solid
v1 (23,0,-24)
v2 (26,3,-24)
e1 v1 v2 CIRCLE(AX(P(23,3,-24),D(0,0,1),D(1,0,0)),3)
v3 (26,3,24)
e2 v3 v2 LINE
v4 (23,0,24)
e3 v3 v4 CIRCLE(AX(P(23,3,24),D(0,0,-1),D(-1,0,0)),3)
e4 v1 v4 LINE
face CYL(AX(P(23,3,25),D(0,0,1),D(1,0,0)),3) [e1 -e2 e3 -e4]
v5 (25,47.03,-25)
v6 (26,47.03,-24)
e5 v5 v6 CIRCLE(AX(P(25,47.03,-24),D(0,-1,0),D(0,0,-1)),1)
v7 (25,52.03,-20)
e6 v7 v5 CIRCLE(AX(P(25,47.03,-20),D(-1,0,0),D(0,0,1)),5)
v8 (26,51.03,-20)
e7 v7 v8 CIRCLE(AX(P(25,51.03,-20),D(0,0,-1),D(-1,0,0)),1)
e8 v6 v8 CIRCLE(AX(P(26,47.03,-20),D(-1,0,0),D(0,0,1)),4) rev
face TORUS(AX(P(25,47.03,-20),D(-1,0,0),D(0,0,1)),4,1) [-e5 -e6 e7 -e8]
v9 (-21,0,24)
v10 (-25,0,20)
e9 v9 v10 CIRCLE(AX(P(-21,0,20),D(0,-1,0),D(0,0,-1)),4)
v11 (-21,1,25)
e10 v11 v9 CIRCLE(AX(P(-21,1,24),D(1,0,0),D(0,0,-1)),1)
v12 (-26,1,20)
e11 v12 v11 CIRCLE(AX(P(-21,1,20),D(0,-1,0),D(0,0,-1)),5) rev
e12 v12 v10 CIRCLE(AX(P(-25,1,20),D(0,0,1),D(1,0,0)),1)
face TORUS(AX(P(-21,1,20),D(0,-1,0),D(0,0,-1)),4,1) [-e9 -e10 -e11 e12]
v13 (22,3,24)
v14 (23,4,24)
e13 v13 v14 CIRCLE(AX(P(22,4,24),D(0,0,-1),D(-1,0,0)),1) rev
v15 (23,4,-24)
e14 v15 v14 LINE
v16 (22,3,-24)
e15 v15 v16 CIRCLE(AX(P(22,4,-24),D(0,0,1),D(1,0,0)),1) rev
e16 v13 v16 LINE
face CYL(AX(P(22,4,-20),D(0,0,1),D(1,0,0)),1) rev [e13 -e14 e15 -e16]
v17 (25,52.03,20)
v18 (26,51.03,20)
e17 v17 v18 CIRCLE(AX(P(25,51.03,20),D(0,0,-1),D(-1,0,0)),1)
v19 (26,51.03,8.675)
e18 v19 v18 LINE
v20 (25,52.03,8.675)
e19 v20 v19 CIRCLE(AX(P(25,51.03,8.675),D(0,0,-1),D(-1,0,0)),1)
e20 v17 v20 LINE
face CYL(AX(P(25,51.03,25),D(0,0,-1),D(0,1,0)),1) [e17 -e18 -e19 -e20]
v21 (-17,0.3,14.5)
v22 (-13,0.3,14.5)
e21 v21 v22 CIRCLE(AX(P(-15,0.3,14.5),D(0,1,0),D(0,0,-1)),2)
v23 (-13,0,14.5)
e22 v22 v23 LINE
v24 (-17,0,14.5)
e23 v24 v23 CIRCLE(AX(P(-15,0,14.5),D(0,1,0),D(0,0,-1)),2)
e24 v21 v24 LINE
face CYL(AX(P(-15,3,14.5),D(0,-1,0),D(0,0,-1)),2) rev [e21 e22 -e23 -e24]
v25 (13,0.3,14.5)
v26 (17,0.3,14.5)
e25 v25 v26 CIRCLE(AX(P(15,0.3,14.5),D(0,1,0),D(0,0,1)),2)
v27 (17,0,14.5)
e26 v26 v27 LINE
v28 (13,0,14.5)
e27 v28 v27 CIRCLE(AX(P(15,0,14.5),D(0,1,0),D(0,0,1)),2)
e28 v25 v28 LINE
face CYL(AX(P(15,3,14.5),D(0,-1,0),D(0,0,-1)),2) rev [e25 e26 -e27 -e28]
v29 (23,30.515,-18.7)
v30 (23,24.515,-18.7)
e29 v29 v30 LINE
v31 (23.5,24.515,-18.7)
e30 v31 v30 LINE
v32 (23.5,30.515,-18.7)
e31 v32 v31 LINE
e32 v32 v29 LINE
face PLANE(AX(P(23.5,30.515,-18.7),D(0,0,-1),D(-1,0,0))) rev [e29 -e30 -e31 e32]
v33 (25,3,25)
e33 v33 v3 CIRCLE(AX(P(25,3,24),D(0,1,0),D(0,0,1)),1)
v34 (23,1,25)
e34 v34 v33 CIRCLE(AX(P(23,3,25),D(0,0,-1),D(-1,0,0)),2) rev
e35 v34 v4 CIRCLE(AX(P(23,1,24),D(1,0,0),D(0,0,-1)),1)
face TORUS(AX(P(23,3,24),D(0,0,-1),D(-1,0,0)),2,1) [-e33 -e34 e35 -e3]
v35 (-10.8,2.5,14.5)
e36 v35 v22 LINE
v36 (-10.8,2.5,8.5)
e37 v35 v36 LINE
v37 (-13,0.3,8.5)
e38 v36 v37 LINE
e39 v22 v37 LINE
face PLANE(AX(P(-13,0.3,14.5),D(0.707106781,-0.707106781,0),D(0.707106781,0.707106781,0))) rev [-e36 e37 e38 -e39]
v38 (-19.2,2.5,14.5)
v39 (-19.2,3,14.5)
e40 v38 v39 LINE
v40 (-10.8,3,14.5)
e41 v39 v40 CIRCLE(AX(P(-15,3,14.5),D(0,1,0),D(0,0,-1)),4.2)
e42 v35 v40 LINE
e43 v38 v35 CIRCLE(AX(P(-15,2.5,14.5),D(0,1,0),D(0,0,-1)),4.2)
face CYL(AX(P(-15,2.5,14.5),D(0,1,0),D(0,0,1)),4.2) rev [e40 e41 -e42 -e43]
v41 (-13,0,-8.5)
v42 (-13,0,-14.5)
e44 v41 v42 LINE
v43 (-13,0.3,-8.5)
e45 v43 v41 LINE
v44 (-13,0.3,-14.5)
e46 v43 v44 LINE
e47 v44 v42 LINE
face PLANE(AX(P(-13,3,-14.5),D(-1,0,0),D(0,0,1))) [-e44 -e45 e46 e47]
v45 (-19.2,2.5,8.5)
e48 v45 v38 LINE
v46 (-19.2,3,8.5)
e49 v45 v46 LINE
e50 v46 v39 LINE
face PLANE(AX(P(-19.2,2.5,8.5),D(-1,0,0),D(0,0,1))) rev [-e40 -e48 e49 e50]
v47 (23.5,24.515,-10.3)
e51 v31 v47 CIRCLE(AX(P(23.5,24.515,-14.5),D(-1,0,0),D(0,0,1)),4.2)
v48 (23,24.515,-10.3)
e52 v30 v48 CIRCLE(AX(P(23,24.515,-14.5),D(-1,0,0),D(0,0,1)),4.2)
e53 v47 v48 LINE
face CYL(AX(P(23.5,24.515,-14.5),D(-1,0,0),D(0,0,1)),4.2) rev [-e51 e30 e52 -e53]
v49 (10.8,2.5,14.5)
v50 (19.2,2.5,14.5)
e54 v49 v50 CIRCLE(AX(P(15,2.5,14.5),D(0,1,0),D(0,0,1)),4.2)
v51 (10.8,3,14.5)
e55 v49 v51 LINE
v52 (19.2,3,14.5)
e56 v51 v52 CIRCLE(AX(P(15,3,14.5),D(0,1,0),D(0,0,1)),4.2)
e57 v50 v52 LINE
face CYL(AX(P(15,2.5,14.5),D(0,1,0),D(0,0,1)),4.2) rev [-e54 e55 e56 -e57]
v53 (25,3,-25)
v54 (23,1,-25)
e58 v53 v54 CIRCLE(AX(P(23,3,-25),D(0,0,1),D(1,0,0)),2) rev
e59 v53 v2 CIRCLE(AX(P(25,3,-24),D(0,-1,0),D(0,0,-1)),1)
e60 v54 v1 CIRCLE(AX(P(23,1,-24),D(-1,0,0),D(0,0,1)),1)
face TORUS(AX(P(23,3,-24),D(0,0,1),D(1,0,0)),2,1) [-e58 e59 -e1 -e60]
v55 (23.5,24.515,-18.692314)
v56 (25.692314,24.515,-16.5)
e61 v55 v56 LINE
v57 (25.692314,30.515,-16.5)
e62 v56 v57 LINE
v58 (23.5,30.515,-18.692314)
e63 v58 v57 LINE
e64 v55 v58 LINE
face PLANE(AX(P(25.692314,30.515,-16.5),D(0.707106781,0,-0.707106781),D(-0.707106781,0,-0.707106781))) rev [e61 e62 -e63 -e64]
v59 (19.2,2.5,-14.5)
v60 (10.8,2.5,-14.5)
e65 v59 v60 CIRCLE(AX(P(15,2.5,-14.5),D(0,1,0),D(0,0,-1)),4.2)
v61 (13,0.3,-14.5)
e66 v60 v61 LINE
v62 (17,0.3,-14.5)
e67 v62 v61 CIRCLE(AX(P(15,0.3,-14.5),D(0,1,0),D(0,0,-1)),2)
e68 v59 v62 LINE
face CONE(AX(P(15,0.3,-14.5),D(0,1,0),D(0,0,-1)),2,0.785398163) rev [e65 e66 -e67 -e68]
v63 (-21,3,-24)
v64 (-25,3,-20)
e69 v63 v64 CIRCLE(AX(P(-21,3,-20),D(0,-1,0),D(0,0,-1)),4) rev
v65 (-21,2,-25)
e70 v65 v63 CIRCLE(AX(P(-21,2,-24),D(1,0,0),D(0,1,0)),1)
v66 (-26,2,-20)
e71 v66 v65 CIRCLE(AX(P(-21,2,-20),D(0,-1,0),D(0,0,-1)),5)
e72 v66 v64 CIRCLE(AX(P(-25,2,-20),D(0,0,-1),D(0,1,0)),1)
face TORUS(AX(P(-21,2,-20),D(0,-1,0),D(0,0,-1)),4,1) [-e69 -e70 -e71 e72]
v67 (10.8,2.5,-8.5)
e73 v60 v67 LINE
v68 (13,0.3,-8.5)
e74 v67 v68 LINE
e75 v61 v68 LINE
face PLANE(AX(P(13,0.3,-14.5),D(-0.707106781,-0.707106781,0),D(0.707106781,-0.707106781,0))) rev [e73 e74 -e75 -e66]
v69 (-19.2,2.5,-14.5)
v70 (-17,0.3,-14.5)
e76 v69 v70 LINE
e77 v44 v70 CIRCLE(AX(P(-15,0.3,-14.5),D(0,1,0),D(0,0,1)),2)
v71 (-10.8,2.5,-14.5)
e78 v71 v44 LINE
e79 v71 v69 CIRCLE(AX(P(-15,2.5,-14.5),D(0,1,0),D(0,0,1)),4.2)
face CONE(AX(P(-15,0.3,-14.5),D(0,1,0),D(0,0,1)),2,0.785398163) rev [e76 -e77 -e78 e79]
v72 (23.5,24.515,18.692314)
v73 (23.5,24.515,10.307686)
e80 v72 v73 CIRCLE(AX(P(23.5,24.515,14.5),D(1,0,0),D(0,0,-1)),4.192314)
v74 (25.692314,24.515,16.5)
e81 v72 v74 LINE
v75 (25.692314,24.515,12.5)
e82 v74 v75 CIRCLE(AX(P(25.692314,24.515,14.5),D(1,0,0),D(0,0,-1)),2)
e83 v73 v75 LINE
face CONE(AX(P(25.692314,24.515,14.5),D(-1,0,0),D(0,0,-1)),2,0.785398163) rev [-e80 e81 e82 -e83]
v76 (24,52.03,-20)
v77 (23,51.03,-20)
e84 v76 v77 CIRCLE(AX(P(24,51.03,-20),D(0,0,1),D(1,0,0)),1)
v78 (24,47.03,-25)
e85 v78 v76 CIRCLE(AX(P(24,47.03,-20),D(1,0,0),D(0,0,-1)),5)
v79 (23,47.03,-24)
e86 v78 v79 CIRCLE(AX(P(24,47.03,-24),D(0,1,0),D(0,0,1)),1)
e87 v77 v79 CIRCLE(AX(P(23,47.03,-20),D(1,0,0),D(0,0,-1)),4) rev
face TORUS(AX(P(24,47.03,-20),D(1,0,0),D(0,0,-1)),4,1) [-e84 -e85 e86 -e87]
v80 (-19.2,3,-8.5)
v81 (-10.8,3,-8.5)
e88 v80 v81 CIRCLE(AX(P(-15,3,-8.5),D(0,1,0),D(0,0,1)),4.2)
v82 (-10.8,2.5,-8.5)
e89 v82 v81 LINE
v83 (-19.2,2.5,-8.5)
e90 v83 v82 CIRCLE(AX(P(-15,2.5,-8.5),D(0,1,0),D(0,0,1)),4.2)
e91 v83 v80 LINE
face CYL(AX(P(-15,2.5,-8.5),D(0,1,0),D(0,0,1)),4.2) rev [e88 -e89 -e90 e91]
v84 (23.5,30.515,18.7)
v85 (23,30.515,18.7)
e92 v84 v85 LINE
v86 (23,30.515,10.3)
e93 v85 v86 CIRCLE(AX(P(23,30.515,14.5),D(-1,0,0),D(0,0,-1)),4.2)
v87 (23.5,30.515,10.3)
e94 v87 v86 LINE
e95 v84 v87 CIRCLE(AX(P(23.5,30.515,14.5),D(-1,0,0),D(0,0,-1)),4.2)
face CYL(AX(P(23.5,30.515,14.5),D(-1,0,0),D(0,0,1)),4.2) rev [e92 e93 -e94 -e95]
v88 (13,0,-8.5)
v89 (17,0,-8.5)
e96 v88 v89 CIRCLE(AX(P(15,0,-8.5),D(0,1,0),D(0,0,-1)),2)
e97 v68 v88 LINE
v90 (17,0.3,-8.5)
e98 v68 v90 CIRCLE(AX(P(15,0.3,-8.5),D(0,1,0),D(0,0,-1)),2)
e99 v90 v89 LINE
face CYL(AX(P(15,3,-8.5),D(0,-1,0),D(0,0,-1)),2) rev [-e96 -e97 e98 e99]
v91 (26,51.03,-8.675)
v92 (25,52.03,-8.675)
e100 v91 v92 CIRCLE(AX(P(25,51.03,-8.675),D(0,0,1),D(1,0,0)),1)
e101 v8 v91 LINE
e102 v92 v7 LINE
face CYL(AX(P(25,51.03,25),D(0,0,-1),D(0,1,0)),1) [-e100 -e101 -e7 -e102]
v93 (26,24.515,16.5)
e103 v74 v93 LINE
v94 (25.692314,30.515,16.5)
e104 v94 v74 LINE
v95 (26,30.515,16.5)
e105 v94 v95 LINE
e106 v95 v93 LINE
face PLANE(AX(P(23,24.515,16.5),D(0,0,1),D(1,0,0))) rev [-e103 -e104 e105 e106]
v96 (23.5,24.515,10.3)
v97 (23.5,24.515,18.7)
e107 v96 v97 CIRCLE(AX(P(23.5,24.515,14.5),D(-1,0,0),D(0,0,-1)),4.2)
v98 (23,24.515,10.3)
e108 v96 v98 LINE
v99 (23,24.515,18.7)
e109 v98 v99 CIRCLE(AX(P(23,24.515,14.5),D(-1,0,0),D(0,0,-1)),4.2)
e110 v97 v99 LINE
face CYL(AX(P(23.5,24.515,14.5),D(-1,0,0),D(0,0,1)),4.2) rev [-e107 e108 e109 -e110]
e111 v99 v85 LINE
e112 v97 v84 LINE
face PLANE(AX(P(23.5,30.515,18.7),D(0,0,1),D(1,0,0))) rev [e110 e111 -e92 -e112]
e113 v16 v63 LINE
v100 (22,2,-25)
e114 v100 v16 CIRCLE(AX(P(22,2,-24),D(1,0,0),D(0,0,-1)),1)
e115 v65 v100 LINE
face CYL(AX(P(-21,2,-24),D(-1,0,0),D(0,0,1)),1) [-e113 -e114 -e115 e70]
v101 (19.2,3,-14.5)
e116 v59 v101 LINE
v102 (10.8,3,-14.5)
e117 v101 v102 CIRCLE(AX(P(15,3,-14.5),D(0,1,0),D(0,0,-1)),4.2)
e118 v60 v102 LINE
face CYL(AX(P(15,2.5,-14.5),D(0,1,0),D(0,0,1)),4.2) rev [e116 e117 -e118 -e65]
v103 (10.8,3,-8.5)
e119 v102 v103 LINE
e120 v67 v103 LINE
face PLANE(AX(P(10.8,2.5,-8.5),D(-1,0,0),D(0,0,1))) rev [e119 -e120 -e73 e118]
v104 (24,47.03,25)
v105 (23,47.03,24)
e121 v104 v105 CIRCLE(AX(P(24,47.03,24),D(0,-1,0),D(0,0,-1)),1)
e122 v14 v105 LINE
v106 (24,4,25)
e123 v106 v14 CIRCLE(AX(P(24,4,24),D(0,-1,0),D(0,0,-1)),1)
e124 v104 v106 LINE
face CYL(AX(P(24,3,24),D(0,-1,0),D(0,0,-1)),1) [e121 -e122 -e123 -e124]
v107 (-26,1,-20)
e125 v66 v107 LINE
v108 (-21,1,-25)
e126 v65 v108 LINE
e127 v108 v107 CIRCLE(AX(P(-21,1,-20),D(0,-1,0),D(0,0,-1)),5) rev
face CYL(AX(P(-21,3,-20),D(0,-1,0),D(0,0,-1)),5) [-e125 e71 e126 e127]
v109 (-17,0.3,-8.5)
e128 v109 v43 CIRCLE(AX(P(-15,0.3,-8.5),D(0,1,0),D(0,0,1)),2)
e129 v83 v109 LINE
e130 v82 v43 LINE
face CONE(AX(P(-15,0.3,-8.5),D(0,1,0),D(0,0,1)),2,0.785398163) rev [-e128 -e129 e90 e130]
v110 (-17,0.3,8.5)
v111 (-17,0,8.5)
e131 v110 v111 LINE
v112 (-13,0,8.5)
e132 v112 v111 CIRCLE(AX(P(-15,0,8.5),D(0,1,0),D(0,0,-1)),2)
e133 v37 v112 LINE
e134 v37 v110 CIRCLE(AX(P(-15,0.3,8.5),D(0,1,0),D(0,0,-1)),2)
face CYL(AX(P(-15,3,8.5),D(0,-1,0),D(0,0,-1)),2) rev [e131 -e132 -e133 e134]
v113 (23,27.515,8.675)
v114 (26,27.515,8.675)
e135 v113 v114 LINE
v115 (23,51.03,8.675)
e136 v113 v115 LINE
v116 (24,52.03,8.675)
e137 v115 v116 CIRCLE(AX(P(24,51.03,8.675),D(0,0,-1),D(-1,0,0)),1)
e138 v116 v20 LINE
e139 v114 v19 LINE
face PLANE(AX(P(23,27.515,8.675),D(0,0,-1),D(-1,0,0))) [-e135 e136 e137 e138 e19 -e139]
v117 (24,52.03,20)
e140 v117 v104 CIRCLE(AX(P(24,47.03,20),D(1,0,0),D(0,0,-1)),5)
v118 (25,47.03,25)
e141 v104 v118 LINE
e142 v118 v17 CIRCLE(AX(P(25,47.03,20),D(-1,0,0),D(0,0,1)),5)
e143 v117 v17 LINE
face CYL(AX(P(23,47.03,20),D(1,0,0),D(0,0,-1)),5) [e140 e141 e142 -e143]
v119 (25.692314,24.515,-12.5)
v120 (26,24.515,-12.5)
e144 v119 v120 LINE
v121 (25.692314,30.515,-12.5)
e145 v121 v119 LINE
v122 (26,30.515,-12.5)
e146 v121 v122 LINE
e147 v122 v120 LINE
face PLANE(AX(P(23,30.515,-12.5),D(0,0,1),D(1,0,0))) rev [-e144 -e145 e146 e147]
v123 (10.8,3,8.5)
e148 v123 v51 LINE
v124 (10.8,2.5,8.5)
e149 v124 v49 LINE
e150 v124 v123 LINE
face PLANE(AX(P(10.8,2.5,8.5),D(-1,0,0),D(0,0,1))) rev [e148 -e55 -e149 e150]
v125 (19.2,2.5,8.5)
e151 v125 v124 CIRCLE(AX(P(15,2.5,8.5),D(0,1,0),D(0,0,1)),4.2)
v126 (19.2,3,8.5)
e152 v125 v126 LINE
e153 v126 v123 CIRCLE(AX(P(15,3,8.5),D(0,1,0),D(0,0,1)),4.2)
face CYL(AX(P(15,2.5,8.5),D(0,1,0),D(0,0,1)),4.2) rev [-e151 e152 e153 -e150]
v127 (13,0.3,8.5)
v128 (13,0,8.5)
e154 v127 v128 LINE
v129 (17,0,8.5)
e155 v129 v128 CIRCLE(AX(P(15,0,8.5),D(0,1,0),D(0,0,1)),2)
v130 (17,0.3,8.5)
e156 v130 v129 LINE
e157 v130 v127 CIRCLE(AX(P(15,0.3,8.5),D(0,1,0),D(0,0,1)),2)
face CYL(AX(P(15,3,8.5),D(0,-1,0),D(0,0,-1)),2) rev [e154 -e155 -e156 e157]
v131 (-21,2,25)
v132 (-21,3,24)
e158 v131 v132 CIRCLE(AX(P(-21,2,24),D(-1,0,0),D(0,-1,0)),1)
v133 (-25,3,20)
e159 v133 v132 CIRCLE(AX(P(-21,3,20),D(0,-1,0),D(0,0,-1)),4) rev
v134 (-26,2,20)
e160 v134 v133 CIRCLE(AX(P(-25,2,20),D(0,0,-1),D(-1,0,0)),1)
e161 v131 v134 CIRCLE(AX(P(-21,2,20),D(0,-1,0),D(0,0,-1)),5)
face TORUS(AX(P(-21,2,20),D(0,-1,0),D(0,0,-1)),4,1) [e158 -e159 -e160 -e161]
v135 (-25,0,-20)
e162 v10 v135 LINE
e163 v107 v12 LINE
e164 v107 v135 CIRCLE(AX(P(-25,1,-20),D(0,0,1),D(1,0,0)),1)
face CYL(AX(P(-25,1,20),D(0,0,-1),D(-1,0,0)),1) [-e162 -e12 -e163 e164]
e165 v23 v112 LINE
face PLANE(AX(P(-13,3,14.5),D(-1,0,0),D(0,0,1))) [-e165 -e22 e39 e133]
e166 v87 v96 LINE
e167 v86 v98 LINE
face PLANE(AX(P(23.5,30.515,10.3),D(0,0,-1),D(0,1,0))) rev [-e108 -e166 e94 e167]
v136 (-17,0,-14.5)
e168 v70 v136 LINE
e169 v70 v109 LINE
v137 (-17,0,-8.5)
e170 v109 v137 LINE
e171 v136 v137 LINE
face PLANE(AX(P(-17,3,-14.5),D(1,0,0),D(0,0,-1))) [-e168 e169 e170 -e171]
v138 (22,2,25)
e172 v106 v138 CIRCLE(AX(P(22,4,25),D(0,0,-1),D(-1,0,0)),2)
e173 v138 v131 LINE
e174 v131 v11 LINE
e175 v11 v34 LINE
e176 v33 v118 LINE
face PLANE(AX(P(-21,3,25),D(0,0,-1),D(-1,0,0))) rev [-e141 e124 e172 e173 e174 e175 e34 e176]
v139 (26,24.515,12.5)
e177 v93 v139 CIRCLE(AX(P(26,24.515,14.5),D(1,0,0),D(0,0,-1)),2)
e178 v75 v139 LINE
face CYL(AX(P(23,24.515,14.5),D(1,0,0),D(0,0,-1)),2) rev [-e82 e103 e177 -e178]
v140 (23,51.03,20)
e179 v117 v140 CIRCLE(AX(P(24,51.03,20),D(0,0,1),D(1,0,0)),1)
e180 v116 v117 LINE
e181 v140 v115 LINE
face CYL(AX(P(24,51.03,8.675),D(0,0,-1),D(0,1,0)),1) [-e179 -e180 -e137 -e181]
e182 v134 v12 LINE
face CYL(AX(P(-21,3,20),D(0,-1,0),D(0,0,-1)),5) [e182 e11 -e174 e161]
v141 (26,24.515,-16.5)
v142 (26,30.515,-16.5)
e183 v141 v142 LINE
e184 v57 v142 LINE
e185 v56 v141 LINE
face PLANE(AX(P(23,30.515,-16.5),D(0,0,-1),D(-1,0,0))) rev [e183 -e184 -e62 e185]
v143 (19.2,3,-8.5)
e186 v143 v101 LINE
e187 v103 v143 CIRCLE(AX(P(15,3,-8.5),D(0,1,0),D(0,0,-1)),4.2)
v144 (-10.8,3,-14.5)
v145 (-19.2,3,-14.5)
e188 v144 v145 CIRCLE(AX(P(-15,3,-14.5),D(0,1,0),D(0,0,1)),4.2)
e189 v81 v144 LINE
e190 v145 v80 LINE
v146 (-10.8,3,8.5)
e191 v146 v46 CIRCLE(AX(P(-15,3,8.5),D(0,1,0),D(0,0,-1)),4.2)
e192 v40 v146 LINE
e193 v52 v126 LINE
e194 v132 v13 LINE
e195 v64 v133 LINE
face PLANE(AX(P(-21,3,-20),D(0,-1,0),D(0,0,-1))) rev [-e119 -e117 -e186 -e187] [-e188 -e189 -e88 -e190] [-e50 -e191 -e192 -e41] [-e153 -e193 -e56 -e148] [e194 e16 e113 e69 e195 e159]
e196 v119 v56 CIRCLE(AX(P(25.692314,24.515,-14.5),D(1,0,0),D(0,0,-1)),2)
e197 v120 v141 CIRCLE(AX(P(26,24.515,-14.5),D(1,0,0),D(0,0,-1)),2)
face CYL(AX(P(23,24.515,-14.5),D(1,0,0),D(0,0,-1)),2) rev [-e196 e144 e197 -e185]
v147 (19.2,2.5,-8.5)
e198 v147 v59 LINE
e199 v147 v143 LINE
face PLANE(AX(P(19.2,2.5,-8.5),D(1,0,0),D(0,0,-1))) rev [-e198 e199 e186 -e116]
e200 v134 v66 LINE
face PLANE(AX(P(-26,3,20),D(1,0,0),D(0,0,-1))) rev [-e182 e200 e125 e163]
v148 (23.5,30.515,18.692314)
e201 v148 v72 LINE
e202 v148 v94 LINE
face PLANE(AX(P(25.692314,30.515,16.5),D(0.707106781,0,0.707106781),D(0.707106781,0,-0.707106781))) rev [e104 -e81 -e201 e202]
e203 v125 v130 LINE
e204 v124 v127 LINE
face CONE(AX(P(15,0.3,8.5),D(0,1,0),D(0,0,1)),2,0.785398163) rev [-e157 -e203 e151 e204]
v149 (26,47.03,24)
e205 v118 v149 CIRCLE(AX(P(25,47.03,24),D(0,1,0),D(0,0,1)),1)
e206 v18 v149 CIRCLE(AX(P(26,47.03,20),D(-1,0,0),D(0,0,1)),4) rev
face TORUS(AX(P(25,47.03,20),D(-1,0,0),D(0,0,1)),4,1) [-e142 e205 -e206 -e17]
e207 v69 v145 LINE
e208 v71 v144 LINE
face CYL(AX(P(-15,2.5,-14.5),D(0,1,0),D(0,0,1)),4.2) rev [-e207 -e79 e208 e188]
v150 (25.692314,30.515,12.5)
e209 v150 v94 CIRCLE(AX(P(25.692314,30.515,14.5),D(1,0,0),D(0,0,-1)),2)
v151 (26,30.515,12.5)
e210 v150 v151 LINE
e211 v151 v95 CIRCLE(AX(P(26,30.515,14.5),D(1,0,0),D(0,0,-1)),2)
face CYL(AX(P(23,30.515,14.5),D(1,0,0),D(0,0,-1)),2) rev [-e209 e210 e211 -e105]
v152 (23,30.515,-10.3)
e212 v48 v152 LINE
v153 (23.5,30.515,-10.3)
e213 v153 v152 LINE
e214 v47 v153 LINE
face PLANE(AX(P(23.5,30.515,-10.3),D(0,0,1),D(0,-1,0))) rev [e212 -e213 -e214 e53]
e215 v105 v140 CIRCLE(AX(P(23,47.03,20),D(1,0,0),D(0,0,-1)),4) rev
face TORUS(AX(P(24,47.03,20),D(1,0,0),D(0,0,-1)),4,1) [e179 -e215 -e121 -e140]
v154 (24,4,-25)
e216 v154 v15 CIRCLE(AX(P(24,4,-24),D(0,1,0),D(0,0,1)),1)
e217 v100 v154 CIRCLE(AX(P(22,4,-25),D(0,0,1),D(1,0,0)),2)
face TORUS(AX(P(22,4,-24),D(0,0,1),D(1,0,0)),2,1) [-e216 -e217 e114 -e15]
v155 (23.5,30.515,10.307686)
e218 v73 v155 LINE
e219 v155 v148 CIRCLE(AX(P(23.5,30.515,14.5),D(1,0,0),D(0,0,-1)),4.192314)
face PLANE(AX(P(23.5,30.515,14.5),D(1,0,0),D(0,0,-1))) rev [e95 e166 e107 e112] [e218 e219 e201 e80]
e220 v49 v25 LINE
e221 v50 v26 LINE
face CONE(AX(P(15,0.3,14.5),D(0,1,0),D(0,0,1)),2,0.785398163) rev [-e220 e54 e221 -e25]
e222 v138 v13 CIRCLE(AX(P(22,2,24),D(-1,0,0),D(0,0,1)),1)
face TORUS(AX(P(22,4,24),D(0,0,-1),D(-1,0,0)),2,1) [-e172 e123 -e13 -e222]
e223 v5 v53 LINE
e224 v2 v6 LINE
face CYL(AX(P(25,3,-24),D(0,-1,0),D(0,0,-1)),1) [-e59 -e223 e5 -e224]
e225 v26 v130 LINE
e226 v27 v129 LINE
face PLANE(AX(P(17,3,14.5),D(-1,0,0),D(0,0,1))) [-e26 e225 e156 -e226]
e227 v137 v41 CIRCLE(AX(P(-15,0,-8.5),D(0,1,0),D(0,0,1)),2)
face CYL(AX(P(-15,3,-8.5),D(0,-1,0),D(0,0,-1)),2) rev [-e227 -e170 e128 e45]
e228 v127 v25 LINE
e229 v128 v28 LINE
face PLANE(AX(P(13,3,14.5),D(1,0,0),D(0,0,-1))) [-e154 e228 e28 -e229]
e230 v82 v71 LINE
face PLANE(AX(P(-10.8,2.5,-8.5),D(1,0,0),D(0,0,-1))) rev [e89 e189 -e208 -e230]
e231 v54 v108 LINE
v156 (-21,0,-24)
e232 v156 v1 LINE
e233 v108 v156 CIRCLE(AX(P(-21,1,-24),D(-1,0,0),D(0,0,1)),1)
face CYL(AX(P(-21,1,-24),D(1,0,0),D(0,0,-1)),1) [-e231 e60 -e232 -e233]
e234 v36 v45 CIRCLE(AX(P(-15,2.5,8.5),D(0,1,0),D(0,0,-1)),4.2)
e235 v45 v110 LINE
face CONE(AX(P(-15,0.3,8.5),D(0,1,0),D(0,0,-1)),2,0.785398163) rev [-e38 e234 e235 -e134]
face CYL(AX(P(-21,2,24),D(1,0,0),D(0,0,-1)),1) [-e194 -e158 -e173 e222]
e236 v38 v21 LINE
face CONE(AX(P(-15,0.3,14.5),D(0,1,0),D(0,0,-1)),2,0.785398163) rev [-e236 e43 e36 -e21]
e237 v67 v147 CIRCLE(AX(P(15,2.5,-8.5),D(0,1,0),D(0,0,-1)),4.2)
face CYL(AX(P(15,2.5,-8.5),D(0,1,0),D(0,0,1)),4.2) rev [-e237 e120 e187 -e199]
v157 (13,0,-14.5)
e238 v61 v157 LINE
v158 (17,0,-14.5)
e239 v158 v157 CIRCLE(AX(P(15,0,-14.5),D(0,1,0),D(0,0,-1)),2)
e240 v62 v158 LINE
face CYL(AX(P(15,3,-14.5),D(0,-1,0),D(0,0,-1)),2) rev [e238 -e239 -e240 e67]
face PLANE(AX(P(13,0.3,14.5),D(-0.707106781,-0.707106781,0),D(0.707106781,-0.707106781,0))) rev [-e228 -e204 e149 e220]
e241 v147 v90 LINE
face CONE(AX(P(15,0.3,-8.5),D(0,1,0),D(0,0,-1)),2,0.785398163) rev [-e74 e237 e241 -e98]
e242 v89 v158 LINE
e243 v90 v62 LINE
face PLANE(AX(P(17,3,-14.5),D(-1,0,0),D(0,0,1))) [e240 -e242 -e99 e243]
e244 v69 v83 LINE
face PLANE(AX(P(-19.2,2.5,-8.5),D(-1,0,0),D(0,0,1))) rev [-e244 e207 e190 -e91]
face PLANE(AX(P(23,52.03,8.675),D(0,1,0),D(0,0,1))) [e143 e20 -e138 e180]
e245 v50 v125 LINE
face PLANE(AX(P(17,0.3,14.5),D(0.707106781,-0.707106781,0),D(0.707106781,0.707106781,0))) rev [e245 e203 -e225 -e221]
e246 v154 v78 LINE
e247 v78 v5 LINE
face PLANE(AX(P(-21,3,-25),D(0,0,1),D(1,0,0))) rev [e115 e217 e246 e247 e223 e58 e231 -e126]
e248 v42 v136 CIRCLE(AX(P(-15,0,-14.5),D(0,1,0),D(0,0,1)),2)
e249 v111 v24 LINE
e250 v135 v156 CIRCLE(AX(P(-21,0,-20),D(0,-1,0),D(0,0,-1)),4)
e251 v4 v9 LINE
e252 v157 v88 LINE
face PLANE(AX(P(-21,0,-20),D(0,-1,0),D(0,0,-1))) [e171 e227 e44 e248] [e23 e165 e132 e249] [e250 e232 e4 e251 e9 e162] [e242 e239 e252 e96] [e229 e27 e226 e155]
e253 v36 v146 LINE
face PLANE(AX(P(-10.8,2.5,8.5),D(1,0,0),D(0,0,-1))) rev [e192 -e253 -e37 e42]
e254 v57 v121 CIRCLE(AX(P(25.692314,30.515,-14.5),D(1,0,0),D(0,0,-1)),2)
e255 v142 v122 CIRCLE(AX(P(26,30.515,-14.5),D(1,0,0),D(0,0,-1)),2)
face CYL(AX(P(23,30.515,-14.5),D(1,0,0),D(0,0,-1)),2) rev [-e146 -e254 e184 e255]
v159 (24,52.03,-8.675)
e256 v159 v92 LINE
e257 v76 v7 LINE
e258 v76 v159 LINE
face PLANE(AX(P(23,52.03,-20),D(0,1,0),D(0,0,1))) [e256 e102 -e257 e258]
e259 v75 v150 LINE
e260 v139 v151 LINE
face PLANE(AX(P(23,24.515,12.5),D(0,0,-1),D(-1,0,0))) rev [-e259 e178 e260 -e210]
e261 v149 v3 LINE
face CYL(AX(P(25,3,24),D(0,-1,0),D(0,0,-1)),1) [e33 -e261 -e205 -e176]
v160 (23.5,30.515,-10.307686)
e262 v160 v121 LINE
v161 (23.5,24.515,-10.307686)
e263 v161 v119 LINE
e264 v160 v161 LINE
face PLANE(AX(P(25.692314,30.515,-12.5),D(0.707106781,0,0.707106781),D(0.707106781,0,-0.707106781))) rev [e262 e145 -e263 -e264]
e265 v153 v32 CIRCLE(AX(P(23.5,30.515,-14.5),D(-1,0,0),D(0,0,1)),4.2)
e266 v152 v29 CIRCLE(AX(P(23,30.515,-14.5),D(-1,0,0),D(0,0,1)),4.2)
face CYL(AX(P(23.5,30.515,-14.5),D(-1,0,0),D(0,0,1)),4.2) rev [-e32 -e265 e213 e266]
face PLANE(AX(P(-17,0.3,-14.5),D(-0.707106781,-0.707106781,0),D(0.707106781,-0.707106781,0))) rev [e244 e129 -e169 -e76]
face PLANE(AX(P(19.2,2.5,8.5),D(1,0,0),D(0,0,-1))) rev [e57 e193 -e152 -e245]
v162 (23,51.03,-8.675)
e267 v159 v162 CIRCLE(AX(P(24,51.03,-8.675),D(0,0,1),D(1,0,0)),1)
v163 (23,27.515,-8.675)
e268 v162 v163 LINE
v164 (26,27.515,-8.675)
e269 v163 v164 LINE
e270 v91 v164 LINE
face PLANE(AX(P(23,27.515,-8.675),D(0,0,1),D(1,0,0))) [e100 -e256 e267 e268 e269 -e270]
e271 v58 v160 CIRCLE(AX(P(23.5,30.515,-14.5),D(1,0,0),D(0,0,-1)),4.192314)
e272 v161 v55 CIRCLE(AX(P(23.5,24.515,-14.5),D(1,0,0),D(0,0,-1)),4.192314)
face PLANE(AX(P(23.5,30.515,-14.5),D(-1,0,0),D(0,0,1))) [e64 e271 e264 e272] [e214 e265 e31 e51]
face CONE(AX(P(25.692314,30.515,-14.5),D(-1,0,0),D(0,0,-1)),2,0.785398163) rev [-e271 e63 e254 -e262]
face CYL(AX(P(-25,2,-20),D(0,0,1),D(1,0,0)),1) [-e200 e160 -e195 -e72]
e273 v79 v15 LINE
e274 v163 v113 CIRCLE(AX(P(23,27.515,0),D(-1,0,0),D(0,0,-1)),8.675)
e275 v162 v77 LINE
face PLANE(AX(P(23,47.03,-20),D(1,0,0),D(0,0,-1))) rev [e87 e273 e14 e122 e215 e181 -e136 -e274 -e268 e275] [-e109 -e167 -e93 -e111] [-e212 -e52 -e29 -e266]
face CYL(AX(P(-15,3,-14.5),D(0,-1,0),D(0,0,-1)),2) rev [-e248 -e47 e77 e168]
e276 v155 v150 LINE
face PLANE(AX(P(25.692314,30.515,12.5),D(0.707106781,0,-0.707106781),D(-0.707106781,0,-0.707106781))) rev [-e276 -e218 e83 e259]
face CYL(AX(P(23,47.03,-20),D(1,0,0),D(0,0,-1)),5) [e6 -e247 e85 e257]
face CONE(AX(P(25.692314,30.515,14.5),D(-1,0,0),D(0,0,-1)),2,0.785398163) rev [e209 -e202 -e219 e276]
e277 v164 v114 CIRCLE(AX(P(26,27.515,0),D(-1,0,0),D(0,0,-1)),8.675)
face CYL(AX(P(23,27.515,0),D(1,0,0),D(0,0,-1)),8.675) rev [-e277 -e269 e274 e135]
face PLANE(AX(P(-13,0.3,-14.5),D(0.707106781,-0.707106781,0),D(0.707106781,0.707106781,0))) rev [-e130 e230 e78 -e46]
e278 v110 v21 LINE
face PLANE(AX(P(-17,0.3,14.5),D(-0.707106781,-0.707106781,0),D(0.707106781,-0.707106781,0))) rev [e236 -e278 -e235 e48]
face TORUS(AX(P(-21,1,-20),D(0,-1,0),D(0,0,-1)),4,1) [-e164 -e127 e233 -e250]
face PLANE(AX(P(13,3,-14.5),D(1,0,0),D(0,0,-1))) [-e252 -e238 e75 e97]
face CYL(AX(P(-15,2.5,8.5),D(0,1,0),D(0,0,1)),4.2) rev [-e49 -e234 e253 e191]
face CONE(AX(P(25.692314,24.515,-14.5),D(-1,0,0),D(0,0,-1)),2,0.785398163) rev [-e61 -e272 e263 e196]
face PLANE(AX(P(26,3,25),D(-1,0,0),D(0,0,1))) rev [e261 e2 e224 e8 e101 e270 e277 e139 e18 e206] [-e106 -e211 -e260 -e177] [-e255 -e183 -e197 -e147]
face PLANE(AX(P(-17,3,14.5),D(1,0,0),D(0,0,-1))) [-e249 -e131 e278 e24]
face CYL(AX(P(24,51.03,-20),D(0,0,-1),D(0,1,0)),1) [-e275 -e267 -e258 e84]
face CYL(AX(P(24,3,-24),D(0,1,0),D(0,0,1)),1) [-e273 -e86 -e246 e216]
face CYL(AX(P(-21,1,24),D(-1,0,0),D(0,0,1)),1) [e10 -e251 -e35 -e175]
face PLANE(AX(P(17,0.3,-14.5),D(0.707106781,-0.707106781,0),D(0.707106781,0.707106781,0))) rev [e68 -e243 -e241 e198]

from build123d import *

# Parameters (mm, degrees)
BOSS_EXTRUDE1_DEPTH           = 3
BOSS_EXTRUDE3_DEPTH           = 3
FILLET2_R                     = 3
FILLET4_R                     = 1
FILLET5_R                     = 1
CUT_EXTRUDE4_DEPTH            = 0.5
CUT_EXTRUDE8_DEPTH            = 0.5
CUT_EXTRUDE12_DEPTH           = 2.192314
CUT_EXTRUDE12_DRAFT           = 45
CUT_EXTRUDE12_PROFILE_2_DEPTH = 2.192314
CUT_EXTRUDE12_PROFILE_2_DRAFT = 45


with BuildPart() as part:
    # Sketch1 → Boss-Extrude1 (new body)
    with BuildSketch(Plane(origin=(0, 0, 0), x_dir=(1, 0, 0), z_dir=(0, 1, 0))):
        with BuildLine():
            Line((-21, -25), (26, -25))
            Line((26, -25), (26, 25))
            Line((26, 25), (-21, 25))
            ThreePointArc((-21, 25), (-24.535533906, 23.535533906), (-26, 20))
            Line((-26, 20), (-26, -20))
            ThreePointArc((-26, -20), (-24.535533906, -23.535533906), (-21, -25))
        make_face()
        with BuildLine():
            Line((-13, 14.5), (-13, 8.5))
            ThreePointArc((-13, 8.5), (-15, 6.5), (-17, 8.5))
            Line((-17, 8.5), (-17, 14.5))
            ThreePointArc((-17, 14.5), (-15, 16.5), (-13, 14.5))
        make_face(mode=Mode.SUBTRACT)
        with BuildLine():
            Line((13, 14.5), (13, 8.5))
            ThreePointArc((13, 8.5), (15, 6.5), (17, 8.5))
            Line((17, 8.5), (17, 14.5))
            ThreePointArc((17, 14.5), (15, 16.5), (13, 14.5))
        make_face(mode=Mode.SUBTRACT)
        with BuildLine():
            Line((13, -14.5), (13, -8.5))
            ThreePointArc((13, -8.5), (15, -6.5), (17, -8.5))
            Line((17, -8.5), (17, -14.5))
            ThreePointArc((17, -14.5), (15, -16.5), (13, -14.5))
        make_face(mode=Mode.SUBTRACT)
        with BuildLine():
            Line((-13, -14.5), (-13, -8.5))
            ThreePointArc((-13, -8.5), (-15, -6.5), (-17, -8.5))
            Line((-17, -8.5), (-17, -14.5))
            ThreePointArc((-17, -14.5), (-15, -16.5), (-13, -14.5))
        make_face(mode=Mode.SUBTRACT)
    extrude(amount=BOSS_EXTRUDE1_DEPTH)

    # Sketch2 → Boss-Extrude3 (add)
    with BuildSketch(Plane(origin=(26, 0, 0), x_dir=(0, 0, -1), z_dir=(1, 0, 0))):
        with BuildLine():
            Line((25, 3), (-25, 3))
            Line((-25, 3), (-25, 47.03))
            ThreePointArc((-25, 47.03), (-23.535533906, 50.565533906), (-20, 52.03))
            Line((-20, 52.03), (-8.675, 52.03))
            Line((-8.675, 52.03), (-8.675, 27.515))
            ThreePointArc((-8.675, 27.515), (0, 18.84), (8.675, 27.515))
            Line((8.675, 27.515), (8.675, 52.03))
            Line((8.675, 52.03), (20, 52.03))
            ThreePointArc((20, 52.03), (23.535533906, 50.565533906), (25, 47.03))
            Line((25, 47.03), (25, 3))
        make_face()
        with BuildLine():
            Line((-16.5, 24.515), (-16.5, 30.515))
            ThreePointArc((-16.5, 30.515), (-14.5, 32.515), (-12.5, 30.515))
            Line((-12.5, 30.515), (-12.5, 24.515))
            ThreePointArc((-12.5, 24.515), (-14.5, 22.515), (-16.5, 24.515))
        make_face(mode=Mode.SUBTRACT)
        with BuildLine():
            Line((16.5, 30.515), (16.5, 24.515))
            ThreePointArc((16.5, 24.515), (14.5, 22.515), (12.5, 24.515))
            Line((12.5, 24.515), (12.5, 30.515))
            ThreePointArc((12.5, 30.515), (14.5, 32.515), (16.5, 30.515))
        make_face(mode=Mode.SUBTRACT)
    extrude(amount=-BOSS_EXTRUDE3_DEPTH)

    # Fillet2
    fillet2_edges = [part.edges().sort_by_distance(p)[0] for p in [
        (26, 0, 0),
    ]]
    fillet(fillet2_edges, radius=FILLET2_R)

    # Fillet4
    fillet4_edges = [part.edges().sort_by_distance(p)[0] for p in [
        (23, 3, 0),
    ]]
    fillet(fillet4_edges, radius=FILLET4_R)

    # Fillet5
    fillet5_edges = [part.edges().sort_by_distance(p)[0] for p in [
        (-24.535533906, 3, -23.535533906),
        (26, 25.015, 25),
        (26, 25.015, -25),
        (1, 0, -25),
        (25.121320344, 0.878679656, -25),
        (25.121320344, 0.878679656, 25),
        (0.5, 3, -25),
        (23, 25.515, -25),
        (22.707106781, 3.292893219, -25),
        (22.707106781, 3.292893219, 25),
        (-26, 3, 0),
        (-24.535533906, 3, 23.535533906),
        (0.5, 3, 25),
        (1, 0, 25),
        (-24.535533906, 0, 23.535533906),
        (-26, 0, 0),
        (-24.535533906, 0, -23.535533906),
        (23, 25.515, 25),
        (23, 50.565533906, 23.535533906),
        (23, 52.03, 14.3375),
        (23, 52.03, -14.3375),
        (23, 50.565533906, -23.535533906),
        (26, 50.565533906, -23.535533906),
        (26, 52.03, -14.3375),
        (26, 52.03, 14.3375),
        (26, 50.565533906, 23.535533906),
    ]]
    fillet(fillet5_edges, radius=FILLET5_R)

    # Sketch5 → Cut-Extrude4 (cut)
    with BuildSketch(Plane(origin=(0, 3, 0), x_dir=(1, 0, 0), z_dir=(0, 1, 0))):
        with BuildLine():
            Line((-19.2, 8.5), (-19.2, 14.5))
            ThreePointArc((-19.2, 14.5), (-15, 18.7), (-10.8, 14.5))
            Line((-10.8, 14.5), (-10.8, 8.5))
            ThreePointArc((-10.8, 8.5), (-15, 4.3), (-19.2, 8.5))
        make_face()
        with BuildLine():
            Line((19.2, 8.5), (19.2, 14.5))
            ThreePointArc((19.2, 14.5), (15, 18.7), (10.8, 14.5))
            Line((10.8, 14.5), (10.8, 8.5))
            ThreePointArc((10.8, 8.5), (15, 4.3), (19.2, 8.5))
        make_face()
        with BuildLine():
            Line((-19.2, -8.5), (-19.2, -14.5))
            ThreePointArc((-19.2, -14.5), (-15, -18.7), (-10.8, -14.5))
            Line((-10.8, -14.5), (-10.8, -8.5))
            ThreePointArc((-10.8, -8.5), (-15, -4.3), (-19.2, -8.5))
        make_face()
        with BuildLine():
            Line((19.2, -8.5), (19.2, -14.5))
            ThreePointArc((19.2, -14.5), (15, -18.7), (10.8, -14.5))
            Line((10.8, -14.5), (10.8, -8.5))
            ThreePointArc((10.8, -8.5), (15, -4.3), (19.2, -8.5))
        make_face()
    extrude(amount=-CUT_EXTRUDE4_DEPTH, mode=Mode.SUBTRACT)

    # Sketch6 → Cut-Extrude8 (cut)
    with BuildSketch(Plane.ZY.offset(-23)):
        with BuildLine():
            Line((-10.3, 30.515), (-10.3, 24.515))
            ThreePointArc((-10.3, 24.515), (-14.5, 20.315), (-18.7, 24.515))
            Line((-18.7, 24.515), (-18.7, 30.515))
            ThreePointArc((-18.7, 30.515), (-14.5, 34.715), (-10.3, 30.515))
        make_face()
        with BuildLine():
            Line((10.3, 30.515), (10.3, 24.515))
            ThreePointArc((10.3, 24.515), (14.5, 20.315), (18.7, 24.515))
            Line((18.7, 24.515), (18.7, 30.515))
            ThreePointArc((18.7, 30.515), (14.5, 34.715), (10.3, 30.515))
        make_face()
    extrude(amount=-CUT_EXTRUDE8_DEPTH, mode=Mode.SUBTRACT)

    # Cut-Extrude11: read off the stored shape, not the designer's step
    # Cut-Extrude11: loft between two sections, ruled curve by curve
    cut_extrude11_from = [
        Edge.make_three_point_arc((-13, 0.3, -14.5), (-13.585786438, 0.3, -15.914213562), (-15, 0.3, -16.5)),
        Edge.make_three_point_arc((-15, 0.3, -16.5), (-16.414213562, 0.3, -15.914213562), (-17, 0.3, -14.5)),
        Edge.make_three_point_arc((-17, 0.3, -8.5), (-16.414213562, 0.3, -7.085786438), (-15, 0.3, -6.5)),
        Edge.make_three_point_arc((-15, 0.3, -6.5), (-13.585786438, 0.3, -7.085786438), (-13, 0.3, -8.5)),
        Edge.make_line((-17, 0.3, -14.5), (-17, 0.3, -8.5)),
        Edge.make_line((-13, 0.3, -8.5), (-13, 0.3, -14.5)),
    ]
    cut_extrude11_to = [
        Edge.make_three_point_arc((-10.8, 2.5, -14.5), (-12.030151519, 2.5, -17.469848481), (-15, 2.5, -18.7)),
        Edge.make_three_point_arc((-15, 2.5, -18.7), (-17.969848481, 2.5, -17.469848481), (-19.2, 2.5, -14.5)),
        Edge.make_three_point_arc((-19.2, 2.5, -8.5), (-17.969848481, 2.5, -5.530151519), (-15, 2.5, -4.3)),
        Edge.make_three_point_arc((-15, 2.5, -4.3), (-12.030151519, 2.5, -5.530151519), (-10.8, 2.5, -8.5)),
        Edge.make_line((-19.2, 2.5, -14.5), (-19.2, 2.5, -8.5)),
        Edge.make_line((-10.8, 2.5, -8.5), (-10.8, 2.5, -14.5)),
    ]
    cut_extrude11 = Solid(Shell([*[Face.make_surface_from_curves(cut_extrude11_from[k], cut_extrude11_to[k]) for k in range(6)], Face(Wire(cut_extrude11_from)), Face(Wire(cut_extrude11_to))]))
    add(cut_extrude11, mode=Mode.SUBTRACT)

    # Cut-Extrude11 2: loft between two sections, ruled curve by curve
    cut_extrude11_2_from = [
        Edge.make_three_point_arc((-17, 0.3, 14.5), (-16.414213562, 0.3, 15.914213562), (-15, 0.3, 16.5)),
        Edge.make_three_point_arc((-15, 0.3, 16.5), (-13.585786438, 0.3, 15.914213562), (-13, 0.3, 14.5)),
        Edge.make_three_point_arc((-13, 0.3, 8.5), (-13.585786438, 0.3, 7.085786438), (-15, 0.3, 6.5)),
        Edge.make_three_point_arc((-15, 0.3, 6.5), (-16.414213562, 0.3, 7.085786438), (-17, 0.3, 8.5)),
        Edge.make_line((-17, 0.3, 8.5), (-17, 0.3, 14.5)),
        Edge.make_line((-13, 0.3, 14.5), (-13, 0.3, 8.5)),
    ]
    cut_extrude11_2_to = [
        Edge.make_three_point_arc((-19.2, 2.5, 14.5), (-17.969848481, 2.5, 17.469848481), (-15, 2.5, 18.7)),
        Edge.make_three_point_arc((-15, 2.5, 18.7), (-12.030151519, 2.5, 17.469848481), (-10.8, 2.5, 14.5)),
        Edge.make_three_point_arc((-10.8, 2.5, 8.5), (-12.030151519, 2.5, 5.530151519), (-15, 2.5, 4.3)),
        Edge.make_three_point_arc((-15, 2.5, 4.3), (-17.969848481, 2.5, 5.530151519), (-19.2, 2.5, 8.5)),
        Edge.make_line((-19.2, 2.5, 8.5), (-19.2, 2.5, 14.5)),
        Edge.make_line((-10.8, 2.5, 14.5), (-10.8, 2.5, 8.5)),
    ]
    cut_extrude11_2 = Solid(Shell([*[Face.make_surface_from_curves(cut_extrude11_2_from[k], cut_extrude11_2_to[k]) for k in range(6)], Face(Wire(cut_extrude11_2_from)), Face(Wire(cut_extrude11_2_to))]))
    add(cut_extrude11_2, mode=Mode.SUBTRACT)

    # Cut-Extrude11 3: loft between two sections, ruled curve by curve
    cut_extrude11_3_from = [
        Edge.make_three_point_arc((17, 0.3, -14.5), (16.414213562, 0.3, -15.914213562), (15, 0.3, -16.5)),
        Edge.make_three_point_arc((15, 0.3, -16.5), (13.585786438, 0.3, -15.914213562), (13, 0.3, -14.5)),
        Edge.make_three_point_arc((13, 0.3, -8.5), (13.585786438, 0.3, -7.085786438), (15, 0.3, -6.5)),
        Edge.make_three_point_arc((15, 0.3, -6.5), (16.414213562, 0.3, -7.085786438), (17, 0.3, -8.5)),
        Edge.make_line((13, 0.3, -14.5), (13, 0.3, -8.5)),
        Edge.make_line((17, 0.3, -8.5), (17, 0.3, -14.5)),
    ]
    cut_extrude11_3_to = [
        Edge.make_three_point_arc((19.2, 2.5, -14.5), (17.969848481, 2.5, -17.469848481), (15, 2.5, -18.7)),
        Edge.make_three_point_arc((15, 2.5, -18.7), (12.030151519, 2.5, -17.469848481), (10.8, 2.5, -14.5)),
        Edge.make_three_point_arc((10.8, 2.5, -8.5), (12.030151519, 2.5, -5.530151519), (15, 2.5, -4.3)),
        Edge.make_three_point_arc((15, 2.5, -4.3), (17.969848481, 2.5, -5.530151519), (19.2, 2.5, -8.5)),
        Edge.make_line((10.8, 2.5, -14.5), (10.8, 2.5, -8.5)),
        Edge.make_line((19.2, 2.5, -8.5), (19.2, 2.5, -14.5)),
    ]
    cut_extrude11_3 = Solid(Shell([*[Face.make_surface_from_curves(cut_extrude11_3_from[k], cut_extrude11_3_to[k]) for k in range(6)], Face(Wire(cut_extrude11_3_from)), Face(Wire(cut_extrude11_3_to))]))
    add(cut_extrude11_3, mode=Mode.SUBTRACT)

    # Cut-Extrude11 4: loft between two sections, ruled curve by curve
    cut_extrude11_4_from = [
        Edge.make_three_point_arc((13, 0.3, 14.5), (13.585786438, 0.3, 15.914213562), (15, 0.3, 16.5)),
        Edge.make_three_point_arc((15, 0.3, 16.5), (16.414213562, 0.3, 15.914213562), (17, 0.3, 14.5)),
        Edge.make_three_point_arc((17, 0.3, 8.5), (16.414213562, 0.3, 7.085786438), (15, 0.3, 6.5)),
        Edge.make_three_point_arc((15, 0.3, 6.5), (13.585786438, 0.3, 7.085786438), (13, 0.3, 8.5)),
        Edge.make_line((13, 0.3, 8.5), (13, 0.3, 14.5)),
        Edge.make_line((17, 0.3, 14.5), (17, 0.3, 8.5)),
    ]
    cut_extrude11_4_to = [
        Edge.make_three_point_arc((10.8, 2.5, 14.5), (12.030151519, 2.5, 17.469848481), (15, 2.5, 18.7)),
        Edge.make_three_point_arc((15, 2.5, 18.7), (17.969848481, 2.5, 17.469848481), (19.2, 2.5, 14.5)),
        Edge.make_three_point_arc((19.2, 2.5, 8.5), (17.969848481, 2.5, 5.530151519), (15, 2.5, 4.3)),
        Edge.make_three_point_arc((15, 2.5, 4.3), (12.030151519, 2.5, 5.530151519), (10.8, 2.5, 8.5)),
        Edge.make_line((10.8, 2.5, 8.5), (10.8, 2.5, 14.5)),
        Edge.make_line((19.2, 2.5, 14.5), (19.2, 2.5, 8.5)),
    ]
    cut_extrude11_4 = Solid(Shell([*[Face.make_surface_from_curves(cut_extrude11_4_from[k], cut_extrude11_4_to[k]) for k in range(6)], Face(Wire(cut_extrude11_4_from)), Face(Wire(cut_extrude11_4_to))]))
    add(cut_extrude11_4, mode=Mode.SUBTRACT)


with BuildPart() as cut_extrude12_tool:
    # Sketch16 → Cut-Extrude12 (with draft: the straight prism first)
    with BuildSketch(Plane(origin=(25.692313855, 0, 0), x_dir=(0, 0, -1), z_dir=(1, 0, 0))):
        with BuildLine():
            ThreePointArc((16.5, 30.515), (14.5, 32.515), (12.5, 30.515))
            Line((12.5, 30.515), (12.5, 24.515))
            ThreePointArc((12.5, 24.515), (14.5, 22.515), (16.5, 24.515))
            Line((16.5, 24.515), (16.5, 30.515))
        make_face()
    extrude(amount=-CUT_EXTRUDE12_DEPTH)
    # Cut-Extrude12: the draft: its side faces are tilted about the plane it starts from
    cut_extrude12_sides = [cut_extrude12_tool.faces().sort_by_distance(p)[0] for p in [
        (24.596156855, 32.515, -14.5),
        (24.596156855, 27.515, -12.5),
        (24.596156855, 22.515, -14.5),
        (24.596156855, 27.515, -16.5),
    ]]
    draft(cut_extrude12_sides, Plane(origin=(25.692313855, 0, 0), x_dir=(0, 0, -1), z_dir=(1, 0, 0)), CUT_EXTRUDE12_DRAFT)


with BuildPart() as part_1:
    add(part.part)

    # Cut-Extrude12: cut by cut_extrude12_tool
    add(cut_extrude12_tool.part, mode=Mode.SUBTRACT)


with BuildPart() as cut_extrude12_profile_2_tool:
    # Sketch16 → Cut-Extrude12 profile 2 (with draft: the straight prism first)
    with BuildSketch(Plane(origin=(25.692313855, 0, 0), x_dir=(0, 0, -1), z_dir=(1, 0, 0))):
        with BuildLine():
            ThreePointArc((-12.5, 30.515), (-14.5, 32.515), (-16.5, 30.515))
            Line((-16.5, 30.515), (-16.5, 24.515))
            ThreePointArc((-16.5, 24.515), (-14.5, 22.515), (-12.5, 24.515))
            Line((-12.5, 24.515), (-12.5, 30.515))
        make_face()
    extrude(amount=-CUT_EXTRUDE12_PROFILE_2_DEPTH)
    # Cut-Extrude12 profile 2: the draft: its side faces are tilted about the plane it starts from
    cut_extrude12_profile_2_sides = [cut_extrude12_profile_2_tool.faces().sort_by_distance(p)[0] for p in [
        (24.596156855, 32.515, 14.5),
        (24.596156855, 27.515, 16.5),
        (24.596156855, 22.515, 14.5),
        (24.596156855, 27.515, 12.5),
    ]]
    draft(cut_extrude12_profile_2_sides, Plane(origin=(25.692313855, 0, 0), x_dir=(0, 0, -1), z_dir=(1, 0, 0)), CUT_EXTRUDE12_PROFILE_2_DRAFT)


with BuildPart() as part_2:
    add(part_1.part)

    # Cut-Extrude12 profile 2: cut by cut_extrude12_profile_2_tool
    add(cut_extrude12_profile_2_tool.part, mode=Mode.SUBTRACT)


solid = part_2.part
